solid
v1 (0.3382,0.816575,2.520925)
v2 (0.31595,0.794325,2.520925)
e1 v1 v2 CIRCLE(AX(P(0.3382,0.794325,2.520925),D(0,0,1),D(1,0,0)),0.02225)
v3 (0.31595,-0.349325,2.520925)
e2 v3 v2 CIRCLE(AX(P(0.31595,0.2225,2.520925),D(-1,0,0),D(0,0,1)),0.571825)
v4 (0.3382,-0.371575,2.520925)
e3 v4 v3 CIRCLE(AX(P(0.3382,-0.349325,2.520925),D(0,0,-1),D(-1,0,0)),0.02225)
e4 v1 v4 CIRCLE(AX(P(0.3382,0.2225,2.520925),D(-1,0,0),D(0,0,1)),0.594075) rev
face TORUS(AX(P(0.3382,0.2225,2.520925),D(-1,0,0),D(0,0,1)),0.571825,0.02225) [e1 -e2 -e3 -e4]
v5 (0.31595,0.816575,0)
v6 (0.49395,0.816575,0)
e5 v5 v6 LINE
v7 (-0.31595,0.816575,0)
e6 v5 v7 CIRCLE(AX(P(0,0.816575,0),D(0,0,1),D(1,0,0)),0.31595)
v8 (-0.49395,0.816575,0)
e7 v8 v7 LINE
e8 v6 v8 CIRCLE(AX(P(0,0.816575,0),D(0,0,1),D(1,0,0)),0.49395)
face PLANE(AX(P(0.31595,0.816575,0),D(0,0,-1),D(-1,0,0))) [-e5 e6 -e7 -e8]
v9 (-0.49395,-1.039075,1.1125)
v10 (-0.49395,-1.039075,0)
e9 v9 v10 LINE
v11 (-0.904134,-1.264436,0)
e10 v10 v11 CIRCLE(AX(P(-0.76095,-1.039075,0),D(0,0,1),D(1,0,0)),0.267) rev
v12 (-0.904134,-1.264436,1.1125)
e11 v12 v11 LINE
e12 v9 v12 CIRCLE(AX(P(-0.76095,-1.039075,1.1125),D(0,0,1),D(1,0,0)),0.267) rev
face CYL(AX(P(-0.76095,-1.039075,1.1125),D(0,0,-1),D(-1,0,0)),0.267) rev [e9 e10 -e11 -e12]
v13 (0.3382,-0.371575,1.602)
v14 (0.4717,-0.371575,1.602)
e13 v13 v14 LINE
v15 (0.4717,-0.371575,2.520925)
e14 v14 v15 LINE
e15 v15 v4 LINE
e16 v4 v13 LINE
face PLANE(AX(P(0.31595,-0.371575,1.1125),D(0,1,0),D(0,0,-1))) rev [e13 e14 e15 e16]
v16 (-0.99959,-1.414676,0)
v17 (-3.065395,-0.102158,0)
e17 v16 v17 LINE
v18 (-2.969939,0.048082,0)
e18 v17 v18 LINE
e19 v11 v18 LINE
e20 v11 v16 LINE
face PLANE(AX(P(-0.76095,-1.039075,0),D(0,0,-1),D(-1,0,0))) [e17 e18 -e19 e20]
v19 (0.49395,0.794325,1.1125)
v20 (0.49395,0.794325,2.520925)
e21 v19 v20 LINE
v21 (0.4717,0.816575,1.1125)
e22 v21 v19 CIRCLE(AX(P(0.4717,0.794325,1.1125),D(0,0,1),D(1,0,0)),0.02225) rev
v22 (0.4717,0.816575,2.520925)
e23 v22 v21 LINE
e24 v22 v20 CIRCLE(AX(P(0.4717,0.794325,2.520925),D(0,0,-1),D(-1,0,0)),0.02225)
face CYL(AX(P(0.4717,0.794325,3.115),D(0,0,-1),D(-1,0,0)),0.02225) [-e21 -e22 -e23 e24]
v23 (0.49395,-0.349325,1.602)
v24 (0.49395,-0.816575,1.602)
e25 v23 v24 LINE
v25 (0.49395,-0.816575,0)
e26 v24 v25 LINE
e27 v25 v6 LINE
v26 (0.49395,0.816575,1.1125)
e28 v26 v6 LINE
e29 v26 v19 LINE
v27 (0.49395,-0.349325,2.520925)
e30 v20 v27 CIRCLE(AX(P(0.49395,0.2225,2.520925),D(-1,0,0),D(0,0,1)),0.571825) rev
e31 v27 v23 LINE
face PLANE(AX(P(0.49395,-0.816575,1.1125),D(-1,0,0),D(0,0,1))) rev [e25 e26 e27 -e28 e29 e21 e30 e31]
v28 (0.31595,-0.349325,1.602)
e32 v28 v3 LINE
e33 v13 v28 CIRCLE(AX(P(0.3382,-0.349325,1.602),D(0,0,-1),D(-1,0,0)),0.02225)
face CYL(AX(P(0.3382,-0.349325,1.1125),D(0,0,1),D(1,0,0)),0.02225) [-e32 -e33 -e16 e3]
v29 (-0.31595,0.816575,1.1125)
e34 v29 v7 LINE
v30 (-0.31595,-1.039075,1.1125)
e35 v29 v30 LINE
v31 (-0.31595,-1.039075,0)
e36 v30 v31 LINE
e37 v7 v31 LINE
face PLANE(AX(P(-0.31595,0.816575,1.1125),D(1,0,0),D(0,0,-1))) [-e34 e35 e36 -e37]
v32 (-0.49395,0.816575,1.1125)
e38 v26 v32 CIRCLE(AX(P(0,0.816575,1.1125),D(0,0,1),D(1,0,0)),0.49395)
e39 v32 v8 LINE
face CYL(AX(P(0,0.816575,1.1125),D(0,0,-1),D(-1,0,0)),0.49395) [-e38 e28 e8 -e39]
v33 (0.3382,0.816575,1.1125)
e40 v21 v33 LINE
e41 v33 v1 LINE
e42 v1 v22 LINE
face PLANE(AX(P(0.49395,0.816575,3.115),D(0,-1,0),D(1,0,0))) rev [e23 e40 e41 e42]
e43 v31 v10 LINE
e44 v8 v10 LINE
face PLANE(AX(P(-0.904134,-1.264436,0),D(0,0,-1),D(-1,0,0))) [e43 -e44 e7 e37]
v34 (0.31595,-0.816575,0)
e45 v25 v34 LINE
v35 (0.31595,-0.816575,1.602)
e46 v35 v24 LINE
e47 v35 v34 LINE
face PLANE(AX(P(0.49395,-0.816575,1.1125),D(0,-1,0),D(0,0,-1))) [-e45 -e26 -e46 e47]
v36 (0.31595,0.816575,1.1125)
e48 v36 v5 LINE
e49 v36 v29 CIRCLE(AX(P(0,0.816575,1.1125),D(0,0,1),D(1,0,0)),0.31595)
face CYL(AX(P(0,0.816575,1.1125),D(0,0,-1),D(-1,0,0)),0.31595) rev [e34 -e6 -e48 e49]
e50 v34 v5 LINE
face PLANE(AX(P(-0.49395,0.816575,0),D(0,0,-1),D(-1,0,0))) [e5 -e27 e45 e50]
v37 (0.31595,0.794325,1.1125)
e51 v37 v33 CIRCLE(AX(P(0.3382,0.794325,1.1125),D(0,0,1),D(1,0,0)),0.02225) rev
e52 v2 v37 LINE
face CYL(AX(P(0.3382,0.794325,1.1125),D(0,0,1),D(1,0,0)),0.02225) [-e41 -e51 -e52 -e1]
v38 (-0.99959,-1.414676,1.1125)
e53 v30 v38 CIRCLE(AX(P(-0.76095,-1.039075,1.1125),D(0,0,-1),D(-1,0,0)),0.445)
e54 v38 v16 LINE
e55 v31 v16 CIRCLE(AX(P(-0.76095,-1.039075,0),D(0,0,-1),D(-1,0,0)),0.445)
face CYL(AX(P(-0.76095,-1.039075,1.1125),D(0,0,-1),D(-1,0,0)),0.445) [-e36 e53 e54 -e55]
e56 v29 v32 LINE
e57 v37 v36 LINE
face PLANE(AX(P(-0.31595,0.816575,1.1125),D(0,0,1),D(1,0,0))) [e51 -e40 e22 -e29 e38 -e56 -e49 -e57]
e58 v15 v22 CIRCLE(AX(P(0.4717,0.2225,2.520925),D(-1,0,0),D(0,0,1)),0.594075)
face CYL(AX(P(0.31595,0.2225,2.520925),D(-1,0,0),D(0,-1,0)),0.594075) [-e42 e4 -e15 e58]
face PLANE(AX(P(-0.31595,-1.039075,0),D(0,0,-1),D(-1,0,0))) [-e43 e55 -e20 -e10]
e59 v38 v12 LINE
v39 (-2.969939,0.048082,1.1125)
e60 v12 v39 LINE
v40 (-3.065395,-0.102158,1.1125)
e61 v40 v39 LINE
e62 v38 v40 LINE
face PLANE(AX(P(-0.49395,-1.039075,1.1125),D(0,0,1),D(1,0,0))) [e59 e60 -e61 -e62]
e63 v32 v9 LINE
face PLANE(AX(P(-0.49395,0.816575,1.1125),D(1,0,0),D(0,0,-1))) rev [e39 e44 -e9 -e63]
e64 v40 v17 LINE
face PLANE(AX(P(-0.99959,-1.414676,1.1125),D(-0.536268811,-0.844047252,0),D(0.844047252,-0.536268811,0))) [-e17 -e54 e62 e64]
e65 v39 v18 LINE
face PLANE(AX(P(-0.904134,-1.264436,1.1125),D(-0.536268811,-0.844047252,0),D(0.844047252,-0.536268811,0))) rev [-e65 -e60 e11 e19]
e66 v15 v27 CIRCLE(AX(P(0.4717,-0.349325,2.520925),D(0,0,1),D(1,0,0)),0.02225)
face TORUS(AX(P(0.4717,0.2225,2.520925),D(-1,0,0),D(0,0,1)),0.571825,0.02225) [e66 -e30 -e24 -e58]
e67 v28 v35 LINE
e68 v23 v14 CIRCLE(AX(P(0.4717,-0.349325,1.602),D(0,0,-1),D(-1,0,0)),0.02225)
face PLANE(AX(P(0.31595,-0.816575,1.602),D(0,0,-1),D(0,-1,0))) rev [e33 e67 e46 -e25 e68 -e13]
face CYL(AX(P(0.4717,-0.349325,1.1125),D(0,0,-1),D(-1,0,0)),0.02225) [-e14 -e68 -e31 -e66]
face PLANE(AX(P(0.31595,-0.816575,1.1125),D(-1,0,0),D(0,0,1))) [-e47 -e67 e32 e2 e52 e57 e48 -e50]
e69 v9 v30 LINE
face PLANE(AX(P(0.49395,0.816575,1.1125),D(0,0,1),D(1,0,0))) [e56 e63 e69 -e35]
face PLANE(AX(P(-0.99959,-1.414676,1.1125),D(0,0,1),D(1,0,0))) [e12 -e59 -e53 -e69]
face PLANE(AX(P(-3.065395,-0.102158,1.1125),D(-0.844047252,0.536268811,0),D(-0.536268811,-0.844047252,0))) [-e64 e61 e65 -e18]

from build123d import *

# Parameters (mm, degrees)
BASE_FLANGE1_DEPTH  = 2.5
SKETCH6_W           = 0.4
SKETCH6_H           = 3.67
BOSS_EXTRUDE1_DEPTH = 4.5
SKETCH7_W           = 3.4
SKETCH7_H           = 1
CUT_EXTRUDE1_DEPTH  = 12.139958989
FILLET1_RADIUS      = 1.335
FILLET1_LENGTH      = 0.4
FILLET2_R           = 0.05
SCALE1_SCALE        = 0.445


# Sheet-metal steps are written as plain solids
with BuildPart() as part:
    # Sketch1 → Base-Flange1 (new body)
    with BuildSketch(Plane.XY):
        with BuildLine():
            Line((0.71, -1.835), (0.71, 1.835))
            ThreePointArc((0.71, 1.835), (0, 2.545), (-0.71, 1.835))
            Line((-0.71, 1.835), (-0.71, -2.335))
            ThreePointArc((-0.71, -2.335), (-1.228475759, -3.211432773), (-2.246268811, -3.179047252))
            Line((-2.246268811, -3.179047252), (-6.888528694, -0.229568793))
            Line((-6.888528694, -0.229568793), (-6.67402117, 0.108050107))
            Line((-6.67402117, 0.108050107), (-2.031761286, -2.841428351))
            ThreePointArc((-2.031761286, -2.841428351), (-1.421085455, -2.860859664), (-1.11, -2.335))
            Line((-1.11, -2.335), (-1.11, 1.835))
            ThreePointArc((-1.11, 1.835), (0, 2.945), (1.11, 1.835))
            Line((1.11, 1.835), (1.11, -1.835))
            Line((1.11, -1.835), (0.71, -1.835))
        make_face()
    extrude(amount=BASE_FLANGE1_DEPTH)

    # Sketch6 → Boss-Extrude1 (add)
    with BuildSketch(Plane.XY.offset(2.5)):
        with Locations((0.91, 0)):
            Rectangle(SKETCH6_W, SKETCH6_H)
    extrude(amount=BOSS_EXTRUDE1_DEPTH)

    # Sketch7 → Cut-Extrude1 (cut, through all)
    with BuildSketch(Plane(origin=(1.11, 0, 0), x_dir=(0, 0, -1), z_dir=(1, 0, 0))):
        with Locations((-5.3, -1.335)):
            Rectangle(SKETCH7_W, SKETCH7_H)
    extrude(amount=-CUT_EXTRUDE1_DEPTH, mode=Mode.SUBTRACT)

    # Fillet1: full round fillet: the end face becomes a half cylinder, R = half its width
    fillet1_face = Plane((0.91, 0.5, 7), x_dir=(-1, 0, 0), z_dir=(0, 0, 1))  # on the end face: x along it, z out of the body
    fillet1_slab = fillet1_face.offset(-FILLET1_RADIUS / 2) * Box(FILLET1_LENGTH, 2 * FILLET1_RADIUS, FILLET1_RADIUS, mode=Mode.PRIVATE)  # the body's end, R deep
    fillet1_round = Plane((0.91, 0.5, 5.665), x_dir=(0, 0, 1), z_dir=(-1, 0, 0)) * Cylinder(FILLET1_RADIUS, FILLET1_LENGTH, mode=Mode.PRIVATE)  # its axis R under the face
    add(fillet1_slab - fillet1_round, mode=Mode.SUBTRACT)

    # Fillet2
    fillet2_edges = [part.edges().sort_by_distance(p)[0] for p in [
        (0.71, 1.835, 4.0825),
        (1.11, 1.835, 4.0825),
        (0.71, -0.835, 4.6325),
        (1.11, -0.835, 4.6325),
        (0.71, 0.5, 7),
        (1.11, 0.5, 7),
    ]]
    fillet(fillet2_edges, radius=FILLET2_R)


with BuildPart() as part_1:
    # Scale1: scaled about (0, 0, 0)
    add(part.part.scale(SCALE1_SCALE))


solid = part_1.part
